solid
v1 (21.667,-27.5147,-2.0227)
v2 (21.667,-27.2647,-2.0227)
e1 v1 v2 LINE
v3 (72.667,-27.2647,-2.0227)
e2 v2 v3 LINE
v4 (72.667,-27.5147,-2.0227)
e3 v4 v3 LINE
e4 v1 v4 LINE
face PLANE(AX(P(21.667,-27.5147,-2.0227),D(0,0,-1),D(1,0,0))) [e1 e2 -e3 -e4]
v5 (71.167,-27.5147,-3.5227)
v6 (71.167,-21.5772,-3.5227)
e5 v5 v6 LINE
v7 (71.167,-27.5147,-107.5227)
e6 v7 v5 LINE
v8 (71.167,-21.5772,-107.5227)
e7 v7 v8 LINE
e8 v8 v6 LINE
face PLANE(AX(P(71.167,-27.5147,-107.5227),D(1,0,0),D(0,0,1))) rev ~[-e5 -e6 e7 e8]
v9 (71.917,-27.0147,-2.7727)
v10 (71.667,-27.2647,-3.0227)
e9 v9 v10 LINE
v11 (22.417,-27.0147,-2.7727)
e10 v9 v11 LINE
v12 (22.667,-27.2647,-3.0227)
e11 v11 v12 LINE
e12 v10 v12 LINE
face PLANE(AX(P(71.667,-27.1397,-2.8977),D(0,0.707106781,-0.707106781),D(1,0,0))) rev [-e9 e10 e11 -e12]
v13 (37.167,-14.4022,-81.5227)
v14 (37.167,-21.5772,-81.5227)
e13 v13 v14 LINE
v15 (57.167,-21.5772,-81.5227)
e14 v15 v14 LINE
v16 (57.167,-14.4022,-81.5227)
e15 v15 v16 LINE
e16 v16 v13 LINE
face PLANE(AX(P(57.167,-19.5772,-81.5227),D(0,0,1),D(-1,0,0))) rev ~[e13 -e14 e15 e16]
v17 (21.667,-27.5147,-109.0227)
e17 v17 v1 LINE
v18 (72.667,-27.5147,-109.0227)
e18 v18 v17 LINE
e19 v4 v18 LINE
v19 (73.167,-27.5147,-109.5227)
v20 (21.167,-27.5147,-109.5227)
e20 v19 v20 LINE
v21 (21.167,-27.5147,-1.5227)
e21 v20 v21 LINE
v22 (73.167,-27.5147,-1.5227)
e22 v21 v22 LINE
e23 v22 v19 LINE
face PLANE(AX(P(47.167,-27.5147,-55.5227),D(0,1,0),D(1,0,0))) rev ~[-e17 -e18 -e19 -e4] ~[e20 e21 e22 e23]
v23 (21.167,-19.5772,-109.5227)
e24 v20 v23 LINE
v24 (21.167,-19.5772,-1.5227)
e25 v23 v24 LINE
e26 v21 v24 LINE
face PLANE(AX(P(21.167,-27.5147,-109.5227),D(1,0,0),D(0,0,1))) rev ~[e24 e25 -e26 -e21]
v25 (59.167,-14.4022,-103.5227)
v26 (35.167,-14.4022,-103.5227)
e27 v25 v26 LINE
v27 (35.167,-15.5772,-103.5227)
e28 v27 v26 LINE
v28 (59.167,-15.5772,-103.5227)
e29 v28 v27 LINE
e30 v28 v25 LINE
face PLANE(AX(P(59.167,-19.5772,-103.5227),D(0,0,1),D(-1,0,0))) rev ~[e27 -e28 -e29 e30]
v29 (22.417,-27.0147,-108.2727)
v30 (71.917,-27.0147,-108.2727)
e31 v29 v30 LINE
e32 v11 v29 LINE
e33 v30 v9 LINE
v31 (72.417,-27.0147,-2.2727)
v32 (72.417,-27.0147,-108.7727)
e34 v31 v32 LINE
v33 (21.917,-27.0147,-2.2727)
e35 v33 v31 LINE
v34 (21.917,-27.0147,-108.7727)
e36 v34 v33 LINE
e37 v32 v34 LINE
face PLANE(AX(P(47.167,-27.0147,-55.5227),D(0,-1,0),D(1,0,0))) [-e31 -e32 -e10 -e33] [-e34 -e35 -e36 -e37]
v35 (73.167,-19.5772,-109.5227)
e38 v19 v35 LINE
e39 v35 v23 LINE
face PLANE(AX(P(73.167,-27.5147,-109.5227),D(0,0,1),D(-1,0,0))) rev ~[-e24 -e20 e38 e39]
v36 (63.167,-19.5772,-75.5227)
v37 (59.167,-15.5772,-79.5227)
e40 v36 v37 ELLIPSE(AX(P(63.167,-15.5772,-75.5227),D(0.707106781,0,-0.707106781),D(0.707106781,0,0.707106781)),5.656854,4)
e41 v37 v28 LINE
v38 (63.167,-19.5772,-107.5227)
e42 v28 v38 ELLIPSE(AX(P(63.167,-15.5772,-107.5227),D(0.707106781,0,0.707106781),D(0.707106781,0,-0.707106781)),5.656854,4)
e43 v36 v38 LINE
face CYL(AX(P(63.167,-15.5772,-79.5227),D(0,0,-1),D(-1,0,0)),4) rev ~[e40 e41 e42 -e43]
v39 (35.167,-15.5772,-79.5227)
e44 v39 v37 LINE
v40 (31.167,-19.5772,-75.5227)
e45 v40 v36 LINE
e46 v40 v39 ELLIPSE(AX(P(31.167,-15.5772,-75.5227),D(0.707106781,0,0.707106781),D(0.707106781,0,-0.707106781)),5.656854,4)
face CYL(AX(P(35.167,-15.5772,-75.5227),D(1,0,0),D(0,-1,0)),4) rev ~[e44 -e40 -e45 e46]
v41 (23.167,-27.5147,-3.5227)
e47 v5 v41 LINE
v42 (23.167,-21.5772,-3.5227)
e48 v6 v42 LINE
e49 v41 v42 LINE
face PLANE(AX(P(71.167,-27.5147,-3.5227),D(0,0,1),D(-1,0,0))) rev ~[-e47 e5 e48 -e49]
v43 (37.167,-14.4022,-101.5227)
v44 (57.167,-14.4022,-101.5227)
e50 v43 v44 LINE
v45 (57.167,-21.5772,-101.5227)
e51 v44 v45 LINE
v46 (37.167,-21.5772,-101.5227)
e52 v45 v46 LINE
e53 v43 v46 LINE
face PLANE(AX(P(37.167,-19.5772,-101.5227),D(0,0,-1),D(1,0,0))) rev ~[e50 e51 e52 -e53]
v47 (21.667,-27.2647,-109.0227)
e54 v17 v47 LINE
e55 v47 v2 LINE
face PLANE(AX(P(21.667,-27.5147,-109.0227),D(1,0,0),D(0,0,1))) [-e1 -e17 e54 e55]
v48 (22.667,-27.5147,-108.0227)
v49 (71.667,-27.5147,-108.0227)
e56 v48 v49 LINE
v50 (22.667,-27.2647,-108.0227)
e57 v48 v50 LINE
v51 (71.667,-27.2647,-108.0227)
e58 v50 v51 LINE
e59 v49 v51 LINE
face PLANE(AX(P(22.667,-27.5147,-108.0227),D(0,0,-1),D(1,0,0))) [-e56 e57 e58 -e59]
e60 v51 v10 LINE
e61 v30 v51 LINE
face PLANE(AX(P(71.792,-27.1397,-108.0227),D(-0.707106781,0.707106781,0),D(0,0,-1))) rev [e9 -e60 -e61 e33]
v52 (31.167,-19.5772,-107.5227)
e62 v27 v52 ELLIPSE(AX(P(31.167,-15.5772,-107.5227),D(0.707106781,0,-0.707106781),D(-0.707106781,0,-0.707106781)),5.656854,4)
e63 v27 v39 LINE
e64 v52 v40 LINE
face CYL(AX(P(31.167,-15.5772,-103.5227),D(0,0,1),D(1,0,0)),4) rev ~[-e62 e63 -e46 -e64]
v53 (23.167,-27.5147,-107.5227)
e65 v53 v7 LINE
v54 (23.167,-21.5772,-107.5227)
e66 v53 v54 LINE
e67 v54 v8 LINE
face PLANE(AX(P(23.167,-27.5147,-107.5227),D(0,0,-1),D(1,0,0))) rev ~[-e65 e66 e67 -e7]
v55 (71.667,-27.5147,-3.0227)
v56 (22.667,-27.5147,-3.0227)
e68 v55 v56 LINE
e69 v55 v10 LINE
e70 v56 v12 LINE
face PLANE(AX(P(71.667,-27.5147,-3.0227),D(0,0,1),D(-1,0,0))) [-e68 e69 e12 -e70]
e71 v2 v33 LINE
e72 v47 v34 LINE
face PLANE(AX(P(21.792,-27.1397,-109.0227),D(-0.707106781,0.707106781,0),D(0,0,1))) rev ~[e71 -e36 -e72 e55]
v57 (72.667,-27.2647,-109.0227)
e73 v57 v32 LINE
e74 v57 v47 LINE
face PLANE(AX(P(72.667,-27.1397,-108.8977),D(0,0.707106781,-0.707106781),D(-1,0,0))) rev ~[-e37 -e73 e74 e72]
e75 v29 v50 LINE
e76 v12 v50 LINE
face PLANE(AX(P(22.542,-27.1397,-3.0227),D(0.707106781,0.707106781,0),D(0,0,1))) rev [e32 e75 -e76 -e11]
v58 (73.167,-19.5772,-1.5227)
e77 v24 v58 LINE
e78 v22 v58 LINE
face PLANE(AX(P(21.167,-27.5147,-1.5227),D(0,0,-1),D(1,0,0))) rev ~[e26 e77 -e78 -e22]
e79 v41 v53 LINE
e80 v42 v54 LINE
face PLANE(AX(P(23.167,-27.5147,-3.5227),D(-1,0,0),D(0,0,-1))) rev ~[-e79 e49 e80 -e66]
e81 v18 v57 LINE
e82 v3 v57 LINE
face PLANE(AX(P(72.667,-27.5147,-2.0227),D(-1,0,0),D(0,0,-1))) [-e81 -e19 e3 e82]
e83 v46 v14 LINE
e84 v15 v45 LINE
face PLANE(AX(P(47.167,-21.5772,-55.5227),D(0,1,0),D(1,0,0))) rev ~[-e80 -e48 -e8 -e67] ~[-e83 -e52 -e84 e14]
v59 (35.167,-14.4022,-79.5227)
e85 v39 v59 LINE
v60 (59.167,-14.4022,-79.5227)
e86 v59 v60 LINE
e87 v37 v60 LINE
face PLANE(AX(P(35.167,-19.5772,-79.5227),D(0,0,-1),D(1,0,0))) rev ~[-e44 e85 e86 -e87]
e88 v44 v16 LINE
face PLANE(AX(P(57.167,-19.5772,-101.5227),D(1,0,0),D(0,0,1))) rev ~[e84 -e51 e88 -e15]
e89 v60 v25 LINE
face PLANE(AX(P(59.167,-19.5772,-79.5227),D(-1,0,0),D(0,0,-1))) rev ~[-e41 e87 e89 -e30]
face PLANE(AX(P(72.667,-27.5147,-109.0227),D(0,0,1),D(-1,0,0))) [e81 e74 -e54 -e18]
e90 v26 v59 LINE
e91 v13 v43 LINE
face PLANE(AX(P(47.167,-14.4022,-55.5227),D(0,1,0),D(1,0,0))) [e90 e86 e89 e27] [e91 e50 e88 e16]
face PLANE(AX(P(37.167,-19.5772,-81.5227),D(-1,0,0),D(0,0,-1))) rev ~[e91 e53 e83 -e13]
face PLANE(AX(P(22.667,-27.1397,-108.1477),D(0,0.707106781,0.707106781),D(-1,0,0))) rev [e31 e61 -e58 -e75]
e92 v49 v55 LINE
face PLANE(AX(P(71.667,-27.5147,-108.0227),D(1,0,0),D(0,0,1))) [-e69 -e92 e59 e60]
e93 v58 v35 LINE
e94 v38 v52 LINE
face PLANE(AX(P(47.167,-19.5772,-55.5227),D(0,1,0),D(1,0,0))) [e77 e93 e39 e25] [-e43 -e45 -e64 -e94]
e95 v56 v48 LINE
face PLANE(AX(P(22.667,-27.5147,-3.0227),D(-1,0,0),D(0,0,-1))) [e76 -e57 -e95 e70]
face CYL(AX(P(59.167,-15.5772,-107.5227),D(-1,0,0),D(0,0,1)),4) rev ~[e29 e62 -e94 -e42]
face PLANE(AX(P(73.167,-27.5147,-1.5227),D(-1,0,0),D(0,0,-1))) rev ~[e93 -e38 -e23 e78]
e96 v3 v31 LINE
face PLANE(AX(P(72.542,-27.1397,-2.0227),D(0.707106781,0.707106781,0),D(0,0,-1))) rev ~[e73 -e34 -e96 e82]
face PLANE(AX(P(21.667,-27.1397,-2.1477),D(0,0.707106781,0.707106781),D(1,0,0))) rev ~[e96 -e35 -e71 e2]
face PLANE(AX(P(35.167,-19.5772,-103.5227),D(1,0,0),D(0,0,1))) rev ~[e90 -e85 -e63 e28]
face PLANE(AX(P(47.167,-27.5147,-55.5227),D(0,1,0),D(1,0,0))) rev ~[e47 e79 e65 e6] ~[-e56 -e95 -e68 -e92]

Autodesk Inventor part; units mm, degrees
ref_plane "YZ Plane" through (0, 0, 0) normal (1, 0, 0) x (0, 1, 0)
ref_plane "XZ Plane" through (0, 0, 0) normal (0, 1, 0) x (-1, 0, 0)
ref_plane "XY Plane" through (0, 0, 0) normal (0, 0, 1) x (1, 0, 0)
ref_plane "Work Plane1" through (47.167, -27.5147, -55.5227) normal (0, 1, 0) x (1, 0, 0)
sketch "Sketch1" plane through (47.167, -27.5147, -55.5227) normal (0, 1, 0) x (1, 0, 0)
  line L0 (-26, -54) -> (26, -54) projected
  line L1 (-26, 54) -> (-26, -54) projected
  line L2 (-26, -54) -> (26, -54) projected
  line L3 (26, -54) -> (26, 54) projected
  line L4 (26, 54) -> (-26, 54) projected
  line L5 (25.5, 53.5) -> (25.5, -53.5) projected
  line L6 (25.5, -53.5) -> (-25.5, -53.5) projected
  line L7 (-25.5, -53.5) -> (-25.5, 53.5) projected
  line L8 (-25.5, 53.5) -> (25.5, 53.5) projected
  line L9 (-24.5, -52.5) -> (24.5, -52.5) projected
  line L10 (24.5, -52.5) -> (24.5, 52.5) projected
  line L11 (24.5, 52.5) -> (-24.5, 52.5) projected
  line L12 (-24.5, 52.5) -> (-24.5, -52.5) projected
  line L13 (-24, -52) -> (-24, 52) projected
  line L14 (-24, 52) -> (24, 52) projected
  line L15 (24, 52) -> (24, -52) projected
  line L16 (24, -52) -> (-24, -52) projected
  point P0 (-47.167, -55.5227)
extrude "Extrusion1" add sketch "Sketch1" along normal blind 7.9375 contours L1 L4 L3 L0 | L5 L6 L7 L8 | L12 L11 L10 L9
sketch "Sketch2" plane through (47.167, -27.5147, -55.5227) normal (0, -1, 0) x (1, 0, 0)
  line L0 (-26, 54) -> (-26, -54) projected
  line L1 (-26, -54) -> (26, -54) projected
  line L2 (26, -54) -> (26, 54) projected
  line L3 (26, 54) -> (-26, 54) projected
  line L4 (-25, -53) -> (-25, 53) construction
  line L5 (-25, 53) -> (25, 53) construction
  line L6 (25, 53) -> (25, -53) construction
  line L7 (25, -53) -> (-25, -53) construction
  line L8 (-25.5, -53.5) -> (-25.5, 53.5)
  line L9 (-25.5, 53.5) -> (25.5, 53.5)
  line L10 (25.5, 53.5) -> (25.5, -53.5)
  line L11 (25.5, -53.5) -> (-25.5, -53.5)
  line L12 (-24.5, 52.5) -> (-24.5, -52.5)
  line L13 (-24.5, -52.5) -> (24.5, -52.5)
  line L14 (24.5, -52.5) -> (24.5, 52.5)
  line L15 (24.5, 52.5) -> (-24.5, 52.5)
  point P0 (-47.167, 55.5227)
  dimension "d2" = 1
  dimension "d3" = 1
extrude "Extrusion2" cut sketch "Sketch2" against normal blind 0.5 contours L8 L9 L10 L11
chamfer "Chamfer1" distance 0.25 angle 45 8 edges at (71.667, -27.0147, -55.5227) (47.167, -27.0147, -3.0227) (72.667, -27.0147, -55.5227) (47.167, -27.0147, -2.0227) (21.667, -27.0147, -55.5227) (22.667, -27.0147, -55.5227) (47.167, -27.0147, -108.0227) (47.167, -27.0147, -109.0227)
sketch "Sketch3" plane through (47.167, -19.5772, -55.5227) normal (0, 1, 0) x (1, 0, 0)
  line L0 (8, 26) -> (8, 24) projected
  line L1 (12, 24) -> (8, 24) projected
  line L2 (12, 48) -> (12, 24) projected
  line L3 (-12, 48) -> (12, 48) projected
  line L4 (-12, 24) -> (-12, 48) projected
  line L5 (-8, 24) -> (-12, 24) projected
  line L6 (-8, 24) -> (-8, 26) projected
  line L7 (-10, 26) -> (-8, 26) projected
  line L8 (-10, 46) -> (-10, 26) projected
  line L9 (10, 46) -> (-10, 46) projected
  line L10 (10, 26) -> (10, 46) projected
  line L11 (8, 26) -> (10, 26) projected
  line L12 (24, 52) -> (24, -52) projected
  line L13 (-24, 52) -> (24, 52) projected
  line L14 (-24, -52) -> (-24, 52) projected
  line L15 (24, -52) -> (-24, -52) projected
  line L16 (-8, 24) -> (8, 24)
  line L17 (8, 24) -> (8, 26)
  line L18 (8, 26) -> (-8, 26)
  line L19 (-8, 26) -> (-8, 24)
  point P0 (-47.167, -55.5227)
extrude "Extrusion3" add sketch "Sketch3" against normal blind 2 contours L11 L10 L9 L8 L7 L6 L5 L4 L3 L2 L1 L0 | L0 L16 L6 L18 | L12 L15 L14 L13
sketch "Sketch4" plane through (47.167, -19.5772, -55.5227) normal (0, 1, 0) x (1, 0, 0)
  line L0 (10, 26) -> (-10, 26) projected
  line L1 (-10, 26) -> (-10, 46) projected
  line L2 (-10, 46) -> (10, 46) projected
  line L3 (10, 46) -> (10, 26) projected
  line L4 (-26, -54) -> (26, -54) projected
  line L5 (26, -54) -> (26, 54) projected
  line L6 (26, 54) -> (-26, 54) projected
  line L7 (-26, 54) -> (-26, -54) projected
  line L8 (-12, 48) -> (-12, 24)
  line L9 (-12, 24) -> (12, 24)
  line L10 (12, 24) -> (12, 48)
  line L11 (12, 48) -> (-12, 48)
  point P0 (-47.167, -55.5227)
  dimension "d11" = 2
extrude "Extrusion4" add sketch "Sketch4" along normal blind 5.175 contours L11 L10 L9 L8
fillet "Fillet1" radius 4 4 edges at (47.167, -19.5772, -79.5227) (59.167, -19.5772, -91.5227) (47.167, -19.5772, -103.5227) (35.167, -19.5772, -91.5227)
equation "\"d2\" = 0.5 * outerShellThickness"
equation "\"d3\" = 0.5 * outerShellThickness"
equation "\"d9\" = outerShellThickness"
equation "\"d11\" = outerShellThickness"
equation "\"outerShellThickness\" = 2"
properties part number "Mid"
